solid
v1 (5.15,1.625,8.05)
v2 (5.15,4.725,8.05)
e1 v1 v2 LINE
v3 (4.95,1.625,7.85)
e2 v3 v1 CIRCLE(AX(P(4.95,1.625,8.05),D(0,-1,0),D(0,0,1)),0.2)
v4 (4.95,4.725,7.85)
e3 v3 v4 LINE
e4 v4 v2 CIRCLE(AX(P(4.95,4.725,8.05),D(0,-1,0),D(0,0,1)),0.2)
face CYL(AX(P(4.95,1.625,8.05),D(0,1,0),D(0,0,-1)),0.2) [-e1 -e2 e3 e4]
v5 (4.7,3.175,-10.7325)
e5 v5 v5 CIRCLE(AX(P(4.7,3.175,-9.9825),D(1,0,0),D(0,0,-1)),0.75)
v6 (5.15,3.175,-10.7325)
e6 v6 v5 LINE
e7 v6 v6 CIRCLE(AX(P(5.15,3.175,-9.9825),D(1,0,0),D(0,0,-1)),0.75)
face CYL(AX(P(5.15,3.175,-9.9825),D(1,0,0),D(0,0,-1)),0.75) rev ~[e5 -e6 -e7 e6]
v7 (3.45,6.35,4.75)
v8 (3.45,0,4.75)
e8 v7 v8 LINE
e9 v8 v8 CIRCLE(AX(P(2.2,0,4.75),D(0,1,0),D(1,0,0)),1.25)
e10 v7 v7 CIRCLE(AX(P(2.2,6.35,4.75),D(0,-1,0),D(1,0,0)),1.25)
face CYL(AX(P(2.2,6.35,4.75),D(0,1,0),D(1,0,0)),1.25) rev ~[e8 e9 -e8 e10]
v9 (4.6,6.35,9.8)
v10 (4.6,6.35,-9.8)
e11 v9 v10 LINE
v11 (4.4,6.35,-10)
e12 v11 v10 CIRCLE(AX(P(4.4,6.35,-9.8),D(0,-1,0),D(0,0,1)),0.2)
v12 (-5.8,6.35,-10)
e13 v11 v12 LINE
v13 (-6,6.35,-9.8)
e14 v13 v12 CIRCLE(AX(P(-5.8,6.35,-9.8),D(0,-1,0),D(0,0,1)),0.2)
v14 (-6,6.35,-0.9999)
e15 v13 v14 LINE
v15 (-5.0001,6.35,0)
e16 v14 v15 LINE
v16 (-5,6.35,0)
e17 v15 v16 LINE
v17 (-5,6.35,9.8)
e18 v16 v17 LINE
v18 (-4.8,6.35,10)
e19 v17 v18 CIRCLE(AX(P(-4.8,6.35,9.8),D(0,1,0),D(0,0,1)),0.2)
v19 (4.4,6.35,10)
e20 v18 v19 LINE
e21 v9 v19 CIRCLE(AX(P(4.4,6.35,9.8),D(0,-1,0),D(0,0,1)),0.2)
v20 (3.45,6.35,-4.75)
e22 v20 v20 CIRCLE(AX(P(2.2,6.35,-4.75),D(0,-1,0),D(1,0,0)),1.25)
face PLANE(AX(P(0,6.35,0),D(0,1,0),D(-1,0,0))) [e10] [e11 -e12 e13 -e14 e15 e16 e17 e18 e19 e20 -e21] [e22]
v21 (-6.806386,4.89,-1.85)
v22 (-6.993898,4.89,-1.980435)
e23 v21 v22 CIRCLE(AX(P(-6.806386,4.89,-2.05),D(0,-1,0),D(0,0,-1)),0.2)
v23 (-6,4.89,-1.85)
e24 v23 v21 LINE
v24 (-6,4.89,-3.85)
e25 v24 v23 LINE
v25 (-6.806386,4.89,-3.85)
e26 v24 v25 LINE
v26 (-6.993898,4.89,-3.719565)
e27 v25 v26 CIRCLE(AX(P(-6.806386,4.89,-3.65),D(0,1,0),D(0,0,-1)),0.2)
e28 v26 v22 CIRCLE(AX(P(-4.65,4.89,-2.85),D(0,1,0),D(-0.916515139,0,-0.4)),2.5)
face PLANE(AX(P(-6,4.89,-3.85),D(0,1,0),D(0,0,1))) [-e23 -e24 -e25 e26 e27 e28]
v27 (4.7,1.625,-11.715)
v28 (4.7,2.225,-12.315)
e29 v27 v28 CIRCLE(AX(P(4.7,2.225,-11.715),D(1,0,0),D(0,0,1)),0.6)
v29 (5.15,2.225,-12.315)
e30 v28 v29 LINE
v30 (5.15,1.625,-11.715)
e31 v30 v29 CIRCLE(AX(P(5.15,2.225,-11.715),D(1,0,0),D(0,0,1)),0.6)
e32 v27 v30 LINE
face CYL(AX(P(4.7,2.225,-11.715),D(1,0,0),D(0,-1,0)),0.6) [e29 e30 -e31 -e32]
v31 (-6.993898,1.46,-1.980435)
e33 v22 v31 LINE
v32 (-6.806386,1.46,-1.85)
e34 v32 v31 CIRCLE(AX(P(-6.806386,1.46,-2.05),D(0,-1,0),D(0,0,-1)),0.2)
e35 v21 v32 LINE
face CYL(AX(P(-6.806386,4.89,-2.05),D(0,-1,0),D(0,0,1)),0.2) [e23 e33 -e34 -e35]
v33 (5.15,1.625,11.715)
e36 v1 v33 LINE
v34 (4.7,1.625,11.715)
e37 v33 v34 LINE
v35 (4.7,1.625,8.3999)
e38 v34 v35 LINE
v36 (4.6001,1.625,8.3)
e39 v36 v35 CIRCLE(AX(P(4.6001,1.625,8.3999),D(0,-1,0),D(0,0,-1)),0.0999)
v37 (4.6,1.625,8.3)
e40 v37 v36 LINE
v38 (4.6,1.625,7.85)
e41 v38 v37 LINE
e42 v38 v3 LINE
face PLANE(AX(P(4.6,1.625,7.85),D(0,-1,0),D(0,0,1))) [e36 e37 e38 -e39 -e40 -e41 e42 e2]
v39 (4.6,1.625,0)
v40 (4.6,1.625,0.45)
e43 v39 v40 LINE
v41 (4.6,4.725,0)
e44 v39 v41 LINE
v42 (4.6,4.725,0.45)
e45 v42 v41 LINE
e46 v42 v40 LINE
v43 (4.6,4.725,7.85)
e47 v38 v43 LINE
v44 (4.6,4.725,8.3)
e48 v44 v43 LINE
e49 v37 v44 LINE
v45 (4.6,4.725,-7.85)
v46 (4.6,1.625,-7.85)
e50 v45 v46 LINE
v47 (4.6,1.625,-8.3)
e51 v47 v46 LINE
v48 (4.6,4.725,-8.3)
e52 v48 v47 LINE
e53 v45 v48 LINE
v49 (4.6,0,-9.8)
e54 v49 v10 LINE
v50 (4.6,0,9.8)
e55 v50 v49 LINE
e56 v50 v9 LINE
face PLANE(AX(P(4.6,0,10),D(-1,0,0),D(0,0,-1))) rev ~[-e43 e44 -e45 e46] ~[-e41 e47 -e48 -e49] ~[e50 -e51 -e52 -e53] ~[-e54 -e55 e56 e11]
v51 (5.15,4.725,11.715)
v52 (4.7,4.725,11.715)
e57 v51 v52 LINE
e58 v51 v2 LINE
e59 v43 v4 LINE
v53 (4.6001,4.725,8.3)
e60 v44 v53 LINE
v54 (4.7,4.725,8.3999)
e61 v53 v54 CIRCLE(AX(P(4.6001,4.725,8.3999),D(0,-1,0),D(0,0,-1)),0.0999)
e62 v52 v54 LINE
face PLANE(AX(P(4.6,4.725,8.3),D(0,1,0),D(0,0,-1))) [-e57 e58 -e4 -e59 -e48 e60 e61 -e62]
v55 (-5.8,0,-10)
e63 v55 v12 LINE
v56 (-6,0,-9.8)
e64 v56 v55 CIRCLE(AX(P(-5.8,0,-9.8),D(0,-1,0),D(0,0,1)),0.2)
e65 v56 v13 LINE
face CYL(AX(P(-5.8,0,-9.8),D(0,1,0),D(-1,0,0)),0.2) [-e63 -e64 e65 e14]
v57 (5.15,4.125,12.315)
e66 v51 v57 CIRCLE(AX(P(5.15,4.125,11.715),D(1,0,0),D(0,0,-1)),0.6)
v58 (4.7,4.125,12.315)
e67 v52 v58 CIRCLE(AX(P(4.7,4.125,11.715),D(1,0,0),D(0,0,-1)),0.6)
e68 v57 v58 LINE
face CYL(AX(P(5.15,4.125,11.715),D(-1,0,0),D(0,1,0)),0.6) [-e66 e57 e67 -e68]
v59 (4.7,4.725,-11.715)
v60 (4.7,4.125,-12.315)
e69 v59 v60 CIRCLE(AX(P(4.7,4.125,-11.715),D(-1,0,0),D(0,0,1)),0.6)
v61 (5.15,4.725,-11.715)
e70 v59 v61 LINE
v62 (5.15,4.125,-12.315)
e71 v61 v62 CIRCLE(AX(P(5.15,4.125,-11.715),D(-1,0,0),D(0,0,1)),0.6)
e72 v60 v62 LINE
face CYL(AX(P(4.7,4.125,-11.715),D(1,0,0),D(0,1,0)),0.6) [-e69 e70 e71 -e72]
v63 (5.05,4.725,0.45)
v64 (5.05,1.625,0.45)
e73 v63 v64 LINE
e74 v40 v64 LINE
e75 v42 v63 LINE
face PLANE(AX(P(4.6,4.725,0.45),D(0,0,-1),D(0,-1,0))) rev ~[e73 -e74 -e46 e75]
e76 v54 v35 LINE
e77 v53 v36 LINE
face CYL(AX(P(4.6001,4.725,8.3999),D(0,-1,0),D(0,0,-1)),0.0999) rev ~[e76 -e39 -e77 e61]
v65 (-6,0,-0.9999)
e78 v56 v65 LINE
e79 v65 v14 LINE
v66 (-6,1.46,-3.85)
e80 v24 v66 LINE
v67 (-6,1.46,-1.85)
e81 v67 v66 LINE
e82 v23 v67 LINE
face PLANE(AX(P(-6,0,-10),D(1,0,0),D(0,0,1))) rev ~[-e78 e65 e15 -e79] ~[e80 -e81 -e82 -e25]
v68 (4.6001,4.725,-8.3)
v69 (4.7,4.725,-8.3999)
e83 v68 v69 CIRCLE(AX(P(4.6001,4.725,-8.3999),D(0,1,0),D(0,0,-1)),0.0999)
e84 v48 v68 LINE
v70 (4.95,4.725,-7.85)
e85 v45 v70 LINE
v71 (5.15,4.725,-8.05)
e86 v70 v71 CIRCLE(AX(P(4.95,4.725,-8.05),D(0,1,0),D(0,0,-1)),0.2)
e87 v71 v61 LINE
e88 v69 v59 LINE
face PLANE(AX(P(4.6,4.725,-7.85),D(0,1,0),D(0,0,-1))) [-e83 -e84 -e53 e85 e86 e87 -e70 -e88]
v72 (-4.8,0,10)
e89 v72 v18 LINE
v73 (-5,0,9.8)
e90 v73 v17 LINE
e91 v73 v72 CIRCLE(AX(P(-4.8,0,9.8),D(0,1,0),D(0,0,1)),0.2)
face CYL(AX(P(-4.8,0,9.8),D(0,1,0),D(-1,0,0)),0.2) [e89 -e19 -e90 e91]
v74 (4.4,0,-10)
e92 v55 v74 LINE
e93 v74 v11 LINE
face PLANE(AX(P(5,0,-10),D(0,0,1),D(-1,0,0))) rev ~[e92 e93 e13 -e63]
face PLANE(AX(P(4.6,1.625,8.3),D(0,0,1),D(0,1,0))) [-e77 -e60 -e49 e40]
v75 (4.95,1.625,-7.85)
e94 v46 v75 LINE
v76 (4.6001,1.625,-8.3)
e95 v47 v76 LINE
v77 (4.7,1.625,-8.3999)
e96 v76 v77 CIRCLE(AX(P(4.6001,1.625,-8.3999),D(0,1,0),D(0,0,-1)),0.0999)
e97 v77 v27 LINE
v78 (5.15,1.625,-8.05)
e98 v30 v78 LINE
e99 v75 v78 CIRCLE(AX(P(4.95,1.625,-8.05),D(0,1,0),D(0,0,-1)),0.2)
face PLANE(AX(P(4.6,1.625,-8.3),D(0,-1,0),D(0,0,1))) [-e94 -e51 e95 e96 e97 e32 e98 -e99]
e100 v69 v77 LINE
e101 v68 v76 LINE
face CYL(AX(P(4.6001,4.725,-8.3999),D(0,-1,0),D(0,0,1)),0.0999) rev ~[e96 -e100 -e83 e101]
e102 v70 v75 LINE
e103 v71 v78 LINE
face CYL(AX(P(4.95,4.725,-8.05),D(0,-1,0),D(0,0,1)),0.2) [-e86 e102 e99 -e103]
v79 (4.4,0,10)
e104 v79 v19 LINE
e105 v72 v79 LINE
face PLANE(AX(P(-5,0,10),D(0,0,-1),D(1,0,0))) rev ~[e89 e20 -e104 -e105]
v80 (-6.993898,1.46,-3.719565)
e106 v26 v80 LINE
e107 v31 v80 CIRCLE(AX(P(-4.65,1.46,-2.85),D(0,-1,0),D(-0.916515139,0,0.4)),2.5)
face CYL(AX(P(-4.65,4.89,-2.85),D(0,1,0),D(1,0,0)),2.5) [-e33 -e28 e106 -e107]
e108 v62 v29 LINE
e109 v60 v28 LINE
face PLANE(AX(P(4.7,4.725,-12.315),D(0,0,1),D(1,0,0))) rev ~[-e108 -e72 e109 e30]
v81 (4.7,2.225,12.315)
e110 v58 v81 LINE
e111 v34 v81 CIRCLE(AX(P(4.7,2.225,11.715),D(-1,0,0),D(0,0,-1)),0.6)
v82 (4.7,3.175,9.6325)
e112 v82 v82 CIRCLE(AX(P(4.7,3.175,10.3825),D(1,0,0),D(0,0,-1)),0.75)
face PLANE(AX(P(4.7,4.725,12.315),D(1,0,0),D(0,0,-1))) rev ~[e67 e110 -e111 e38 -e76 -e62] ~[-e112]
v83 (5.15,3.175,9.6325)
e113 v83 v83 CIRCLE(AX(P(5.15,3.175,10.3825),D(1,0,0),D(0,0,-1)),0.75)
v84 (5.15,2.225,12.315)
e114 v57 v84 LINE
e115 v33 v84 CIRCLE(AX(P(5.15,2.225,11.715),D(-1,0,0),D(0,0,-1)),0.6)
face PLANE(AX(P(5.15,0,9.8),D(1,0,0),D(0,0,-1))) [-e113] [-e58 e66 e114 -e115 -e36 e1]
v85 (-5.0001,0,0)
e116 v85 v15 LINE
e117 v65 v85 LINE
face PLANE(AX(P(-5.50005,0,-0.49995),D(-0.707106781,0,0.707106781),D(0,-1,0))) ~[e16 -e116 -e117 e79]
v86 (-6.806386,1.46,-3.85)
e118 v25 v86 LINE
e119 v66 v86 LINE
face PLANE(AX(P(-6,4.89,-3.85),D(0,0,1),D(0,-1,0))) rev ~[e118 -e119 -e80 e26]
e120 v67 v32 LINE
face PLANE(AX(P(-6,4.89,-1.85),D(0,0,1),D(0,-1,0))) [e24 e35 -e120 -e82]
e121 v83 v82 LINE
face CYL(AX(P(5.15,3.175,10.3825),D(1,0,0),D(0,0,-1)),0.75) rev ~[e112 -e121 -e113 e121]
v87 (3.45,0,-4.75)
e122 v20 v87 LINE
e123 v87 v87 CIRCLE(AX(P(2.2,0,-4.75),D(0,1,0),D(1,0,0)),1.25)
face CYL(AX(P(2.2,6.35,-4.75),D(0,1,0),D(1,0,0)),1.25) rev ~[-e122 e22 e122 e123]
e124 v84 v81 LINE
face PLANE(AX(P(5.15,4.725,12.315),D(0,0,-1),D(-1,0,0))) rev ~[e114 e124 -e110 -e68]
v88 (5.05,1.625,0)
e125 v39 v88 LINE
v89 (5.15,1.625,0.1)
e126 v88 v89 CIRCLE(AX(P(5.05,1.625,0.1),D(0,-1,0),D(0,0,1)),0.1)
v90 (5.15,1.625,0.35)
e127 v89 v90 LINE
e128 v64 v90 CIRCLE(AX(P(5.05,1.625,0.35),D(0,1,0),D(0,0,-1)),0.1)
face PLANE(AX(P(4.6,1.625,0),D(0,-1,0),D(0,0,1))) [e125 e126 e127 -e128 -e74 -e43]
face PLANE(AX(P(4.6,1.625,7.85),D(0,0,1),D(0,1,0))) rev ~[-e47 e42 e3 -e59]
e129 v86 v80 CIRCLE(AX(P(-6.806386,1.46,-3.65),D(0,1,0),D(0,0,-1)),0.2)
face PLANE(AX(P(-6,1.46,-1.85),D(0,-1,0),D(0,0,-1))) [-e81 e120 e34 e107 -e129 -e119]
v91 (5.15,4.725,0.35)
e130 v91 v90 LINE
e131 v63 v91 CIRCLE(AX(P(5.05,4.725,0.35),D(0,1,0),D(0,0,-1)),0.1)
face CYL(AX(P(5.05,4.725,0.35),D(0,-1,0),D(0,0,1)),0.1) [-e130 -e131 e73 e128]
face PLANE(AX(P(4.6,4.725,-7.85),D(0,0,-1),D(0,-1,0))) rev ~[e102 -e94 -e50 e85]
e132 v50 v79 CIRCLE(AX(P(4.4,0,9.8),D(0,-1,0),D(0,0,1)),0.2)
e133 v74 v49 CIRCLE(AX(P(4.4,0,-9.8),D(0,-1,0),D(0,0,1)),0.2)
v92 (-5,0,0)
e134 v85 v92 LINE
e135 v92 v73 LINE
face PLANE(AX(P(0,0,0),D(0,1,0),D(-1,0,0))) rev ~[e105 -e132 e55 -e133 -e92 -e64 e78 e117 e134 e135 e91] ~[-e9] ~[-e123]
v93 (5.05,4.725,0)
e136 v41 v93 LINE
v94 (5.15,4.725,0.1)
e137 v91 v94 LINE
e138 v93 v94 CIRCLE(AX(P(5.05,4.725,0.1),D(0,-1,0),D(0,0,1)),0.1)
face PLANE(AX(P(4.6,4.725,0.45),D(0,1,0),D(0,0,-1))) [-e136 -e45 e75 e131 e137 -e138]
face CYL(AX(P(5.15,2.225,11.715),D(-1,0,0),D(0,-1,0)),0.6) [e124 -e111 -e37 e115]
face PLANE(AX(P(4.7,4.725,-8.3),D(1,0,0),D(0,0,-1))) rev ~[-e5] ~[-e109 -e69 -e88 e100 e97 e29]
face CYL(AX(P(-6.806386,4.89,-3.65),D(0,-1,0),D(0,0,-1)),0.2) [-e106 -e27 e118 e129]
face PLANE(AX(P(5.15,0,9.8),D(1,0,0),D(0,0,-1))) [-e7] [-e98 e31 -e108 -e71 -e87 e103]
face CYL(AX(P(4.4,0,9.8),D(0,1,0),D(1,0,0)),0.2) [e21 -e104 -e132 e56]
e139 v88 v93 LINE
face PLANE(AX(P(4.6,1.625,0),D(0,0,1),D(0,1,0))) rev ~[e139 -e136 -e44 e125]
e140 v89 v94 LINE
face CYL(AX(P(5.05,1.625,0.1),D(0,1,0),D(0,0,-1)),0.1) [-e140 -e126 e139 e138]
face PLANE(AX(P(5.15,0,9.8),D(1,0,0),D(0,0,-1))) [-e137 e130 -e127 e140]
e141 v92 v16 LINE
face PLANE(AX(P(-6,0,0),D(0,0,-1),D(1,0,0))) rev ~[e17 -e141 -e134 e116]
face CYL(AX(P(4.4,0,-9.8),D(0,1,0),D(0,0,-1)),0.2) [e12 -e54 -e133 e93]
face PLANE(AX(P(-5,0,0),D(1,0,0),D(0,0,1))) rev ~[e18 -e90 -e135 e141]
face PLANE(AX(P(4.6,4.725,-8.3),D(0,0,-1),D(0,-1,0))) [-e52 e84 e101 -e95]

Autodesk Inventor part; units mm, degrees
ref_plane "YZ Plane" through (0, 0, 0) normal (1, 0, 0) x (0, 1, 0)
ref_plane "XZ Plane" through (0, 0, 0) normal (0, 1, 0) x (-1, 0, 0)
ref_plane "XY Plane" through (0, 0, 0) normal (0, 0, 1) x (1, 0, 0)
sketch "Skizze1" plane through (0, 0, 0) normal (0, 1, 0) x (-1, 0, 0)
  line L0 (5, 10) -> (-5, 10)
  line L1 (-5, 10) -> (-5, -10)
  line L2 (-5, -10) -> (5, -10)
  line L3 (5, -10) -> (5, 10)
  line L4 (5, 10) -> (-5, -10) construction
  line L5 (-5, 10) -> (5, -10) construction
  line L6 (5, -10) -> (6, -10)
  line L7 (6, -10) -> (6, 0)
  line L8 (6, 0) -> (5, 0)
  line L9 (5, 0) -> (5, -10)
  point P0 (0, 0)
  dimension "d0" = 10
  dimension "d1" = 20
  dimension "d2" = 1
extrude "Extrusion1" add sketch "Skizze1" along normal blind 6.35
sketch "Skizze2" plane through (-6, 0, -10) normal (-1, 0, 0) x (0, 0, 1)
  line L0 (0, 0) -> (0, 6.35) projected
  line L1 (0, 0) -> (10, 0) projected
  line L2 (0, 6.35) -> (8.15, 6.35)
  line L3 (8.15, 6.35) -> (8.15, 0)
  line L4 (8.15, 0) -> (0, 0)
  line L5 (0, 0) -> (0, 6.35)
  line L6 (8.15, 6.35) -> (6.15, 6.35)
  line L7 (6.15, 6.35) -> (6.15, 0)
  line L8 (6.15, 0) -> (8.15, 0)
  line L9 (8.15, 0) -> (8.15, 6.35)
  line L10 (6.15, 4.89) -> (8.15, 4.89)
  line L11 (8.15, 4.89) -> (8.15, 1.46)
  line L12 (8.15, 1.46) -> (6.15, 1.46)
  line L13 (6.15, 1.46) -> (6.15, 4.89)
  line L14 (6.15, 4.89) -> (8.15, 1.46) construction
  line L15 (8.15, 4.89) -> (6.15, 1.46) construction
  point P0 (7.15, 3.175)
  point P1 (8.15, 1.46)
  dimension "d5" = 8.15
  dimension "d6" = 2
  dimension "d7" = 2
  dimension "d8" = 3.43
extrude "Extrusion2" add sketch "Skizze2" along normal blind 1.15 contours L7 L10 L3 L12
sketch "Skizze3" plane through (-6, 4.89, -1.85) normal (0, 1, 0) x (1, 0, 0)
  line L0 (0, 2) -> (0, 0) projected
  line L1 (0, 2) -> (-1.15, 2) projected
  line L2 (-1.15, 0) -> (-1.15, 2) projected
  line L3 (0, 0) -> (-1.15, 0) projected
  circle A0 centre (1.35, 1) radius 2.5
  point P0 (6, -1.85)
  point P1 (-1.15, 1)
  point P2 (-0.9413, 0)
  point P3 (-0.9413, 2)
  dimension "d11" = 5
extrude "Extrusion3" cut sketch "Skizze3" against normal through all contours A0 L2 L1 | L3 L2 A0
fillet "Rundung1" radius 0.2 2 edges at (-6.9413, 3.175, -1.85) (-6.9413, 3.175, -3.85)
chamfer "Fase1" distance 1 angle 45 1 edges at (-6, 3.175, 0)
fillet "Rundung2" radius 0.2 4 edges at (-5, 3.175, 10) (5, 3.175, 10) (5, 3.175, -10) (-6, 3.175, -10)
move faces "Verschieben1" translate (-0.4, 0, 0) faces at (4.8149, 2.1167, 9.9994) (4.936, 2.1167, -9.9466) (5, 2.1167, 3.2667)
sketch "Skizze4" plane through (4.6, 0, 9.8) normal (1, 0, 0) x (0, 0, -1)
  line L0 (19.6, 6.35) -> (19.6, 0) projected
  line L1 (0, 6.35) -> (19.6, 6.35) projected
  line L2 (0, 0) -> (0, 6.35) projected
  line L3 (0, 0) -> (19.6, 0) projected
  line L4 (1.95, 4.725) -> (17.65, 4.725)
  line L5 (17.65, 4.725) -> (17.65, 1.625)
  line L6 (17.65, 1.625) -> (1.95, 1.625)
  line L7 (1.95, 1.625) -> (1.95, 4.725)
  line L8 (9.8, 0) -> (9.8, 6.35) projected
  line L9 (1.95, 4.725) -> (17.65, 1.625) construction
  line L10 (17.65, 4.725) -> (1.95, 1.625) construction
  line L11 (1.5, 4.725) -> (18.1, 4.725)
  line L12 (18.1, 4.725) -> (18.1, 1.625)
  line L13 (18.1, 1.625) -> (1.5, 1.625)
  line L14 (1.5, 1.625) -> (1.5, 4.725)
  line L15 (1.5, 4.725) -> (18.1, 1.625) construction
  line L16 (18.1, 4.725) -> (1.5, 1.625) construction
  line L17 (9.8, 4.725) -> (9.35, 4.725)
  line L18 (9.35, 4.725) -> (9.35, 1.625)
  line L19 (9.35, 1.625) -> (9.8, 1.625)
  line L20 (9.8, 1.625) -> (9.8, 4.725)
  point P0 (9.8, 3.175)
  point P1 (9.8, 3.175)
  point P2 (17.65, 4.725)
  point P3 (17.65, 1.625)
  point P4 (9.35, 4.725)
  point P5 (9.8, 1.625)
  point P6 (9.8, 4.725)
  point P7 (1.95, 1.625)
  point P8 (1.95, 4.725)
  dimension "d22" = 15.7
  dimension "d23" = 3.1
  dimension "d24" = 16.6
  dimension "d25" = 0.45
extrude "Extrusion4" add sketch "Skizze4" along normal blind 0.55 contours L8 L6 L18 L4 | L11 L12 L13 L5 | L7 L13 L14 L11
sketch "Skizze5" plane through (4.6, 4.725, 8.3) normal (0, 1, 0) x (1, 0, 0)
  line L0 (0, 0) -> (0, 0.45) projected
  line L1 (0, 0) -> (0.55, 0) projected
  line L2 (0.55, 0.45) -> (0.55, 0) projected
  line L3 (0, 0.45) -> (0.55, 0.45) projected
  line L4 (0, 16.15) -> (0, 16.6) projected
  line L5 (0, 16.15) -> (0.55, 16.15) projected
  line L6 (0.55, 16.6) -> (0.55, 16.15) projected
  line L7 (0, 16.6) -> (0.55, 16.6) projected
  line L8 (1, -4.015) -> (0.1, -4.015)
  line L9 (0.1, -4.015) -> (0.1, 20.615)
  line L10 (0.1, 20.615) -> (1, 20.615)
  line L11 (1, 20.615) -> (1, -4.015)
  line L12 (0.55, 7.85) -> (0.55, 8.3) projected
  line L13 (1, -4.015) -> (0.1, 20.615) construction
  line L14 (0.1, -4.015) -> (1, 20.615) construction
  line L15 (0.55, 20.615) -> (0.55, -4.015)
  point P0 (-4.6, 8.3)
  point P1 (0.1, 16.6)
  point P2 (0.1, 0)
  dimension "d28" = 0.9
  dimension "d29" = 24.63
extrude "Extrusion5" add sketch "Skizze5" against normal up to surface (3.1 mm away) contours L1 L15 L8 L9 | L9 L10 L15 L7
fillet "Rundung3" radius 0.2 2 edges at (5.15, 3.175, -7.85) (5.15, 3.175, 7.85)
fillet "Rundung4" radius 0.1 2 edges at (4.7, 3.175, -8.3) (4.7, 3.175, 8.3)
fillet "Rundung5" radius 0.1 2 edges at (5.15, 3.175, 0.45) (5.15, 3.175, 0)
sketch "Skizze6" plane through (5.15, 0, 9.8) normal (1, 0, 0) x (0, 0, -1)
  line L0 (1.75, 4.725) -> (1.75, 1.625) projected
  line L1 (1.75, 4.725) -> (-2.515, 4.725) projected
  line L2 (-2.515, 4.725) -> (-2.515, 1.625) projected
  line L3 (-2.515, 1.625) -> (1.75, 1.625) projected
  line L4 (17.85, 1.625) -> (17.85, 4.725) projected
  line L5 (17.85, 1.625) -> (22.115, 1.625) projected
  line L6 (22.115, 4.725) -> (22.115, 1.625) projected
  line L7 (17.85, 4.725) -> (22.115, 4.725) projected
  circle A0 centre (-0.5825, 3.175) radius 0.75
  circle A1 centre (19.7825, 3.175) radius 0.75
  point P0 (9.8, 0)
  dimension "d35" = 1.5
  dimension "d36" = 1.5
extrude "Extrusion6" cut sketch "Skizze6" against normal up to surface (0.45 mm away) contours A0 | A1
sketch "Skizze7" plane through (0, 6.35, 0) normal (0, 1, 0) x (1, 0, 0)
  line L0 (3.45, 6) -> (0.95, 6)
  line L1 (0.95, 6) -> (0.95, -6)
  line L2 (0.95, -6) -> (3.45, -6)
  line L3 (3.45, -6) -> (3.45, 6)
  line L4 (3.45, 6) -> (0.95, -6) construction
  line L5 (0.95, 6) -> (3.45, -6) construction
  line L6 (3.45, 3.5) -> (0.95, 3.5)
  line L7 (0.95, 3.5) -> (0.95, -3.5)
  line L8 (0.95, -3.5) -> (3.45, -3.5)
  line L9 (3.45, -3.5) -> (3.45, 3.5)
  line L10 (3.45, 3.5) -> (0.95, -3.5) construction
  line L11 (0.95, 3.5) -> (3.45, -3.5) construction
  circle A0 centre (2.2, 4.75) radius 1.25
  circle A1 centre (2.2, -4.75) radius 1.25
  arc A2 (4.95, 7.85) -> (5.15, 8.05) centre (4.95, 8.05) ccw projected
  line L12 (5.15, 8.05) -> (5.15, 12.315) projected
  line L13 (5.15, 12.315) -> (4.7, 12.315) projected
  line L14 (4.7, 12.315) -> (4.7, 8.4) projected
  arc A3 (4.6, 8.3) -> (4.7, 8.4) centre (4.6, 8.4) ccw projected
  line L15 (4.6, 7.85) -> (4.6, 8.3) projected
  line L16 (4.6, 7.85) -> (4.95, 7.85) projected
  arc A4 (5.15, -8.05) -> (4.95, -7.85) centre (4.95, -8.05) ccw projected
  line L17 (4.6, -7.85) -> (4.95, -7.85) projected
  line L18 (4.6, -8.3) -> (4.6, -7.85) projected
  arc A5 (4.7, -8.4) -> (4.6, -8.3) centre (4.6, -8.4) ccw projected
  line L19 (4.7, -8.4) -> (4.7, -12.315) projected
  line L20 (4.7, -12.315) -> (5.15, -12.315) projected
  line L21 (5.15, -8.05) -> (5.15, -12.315) projected
  point P0 (0, 0)
  point P1 (2.2, 0)
  point P2 (2.2, 0)
  point P3 (2.2, 3.5)
  point P4 (2.2, 6)
  point P5 (2.2, 0)
  dimension "d39" = 2.5
  dimension "d40" = 12
  dimension "d41" = 2.5
  dimension "d42" = 7
  dimension "d43" = 1.7
  dimension "d44" = 24.63
  dimension "d45" = 12.315
  dimension "d46" = 2.95
extrude "Extrusion7" cut sketch "Skizze7" against normal through all contours A0 | A1
fillet "Rundung6" radius 0.6 4 edges at (4.925, 4.725, 12.315) (4.925, 1.625, 12.315) (4.925, 4.725, -12.315) (4.925, 1.625, -12.315)
equation "\"d45\" = 0.5 * d44"
properties part number "Glicky_3D"
